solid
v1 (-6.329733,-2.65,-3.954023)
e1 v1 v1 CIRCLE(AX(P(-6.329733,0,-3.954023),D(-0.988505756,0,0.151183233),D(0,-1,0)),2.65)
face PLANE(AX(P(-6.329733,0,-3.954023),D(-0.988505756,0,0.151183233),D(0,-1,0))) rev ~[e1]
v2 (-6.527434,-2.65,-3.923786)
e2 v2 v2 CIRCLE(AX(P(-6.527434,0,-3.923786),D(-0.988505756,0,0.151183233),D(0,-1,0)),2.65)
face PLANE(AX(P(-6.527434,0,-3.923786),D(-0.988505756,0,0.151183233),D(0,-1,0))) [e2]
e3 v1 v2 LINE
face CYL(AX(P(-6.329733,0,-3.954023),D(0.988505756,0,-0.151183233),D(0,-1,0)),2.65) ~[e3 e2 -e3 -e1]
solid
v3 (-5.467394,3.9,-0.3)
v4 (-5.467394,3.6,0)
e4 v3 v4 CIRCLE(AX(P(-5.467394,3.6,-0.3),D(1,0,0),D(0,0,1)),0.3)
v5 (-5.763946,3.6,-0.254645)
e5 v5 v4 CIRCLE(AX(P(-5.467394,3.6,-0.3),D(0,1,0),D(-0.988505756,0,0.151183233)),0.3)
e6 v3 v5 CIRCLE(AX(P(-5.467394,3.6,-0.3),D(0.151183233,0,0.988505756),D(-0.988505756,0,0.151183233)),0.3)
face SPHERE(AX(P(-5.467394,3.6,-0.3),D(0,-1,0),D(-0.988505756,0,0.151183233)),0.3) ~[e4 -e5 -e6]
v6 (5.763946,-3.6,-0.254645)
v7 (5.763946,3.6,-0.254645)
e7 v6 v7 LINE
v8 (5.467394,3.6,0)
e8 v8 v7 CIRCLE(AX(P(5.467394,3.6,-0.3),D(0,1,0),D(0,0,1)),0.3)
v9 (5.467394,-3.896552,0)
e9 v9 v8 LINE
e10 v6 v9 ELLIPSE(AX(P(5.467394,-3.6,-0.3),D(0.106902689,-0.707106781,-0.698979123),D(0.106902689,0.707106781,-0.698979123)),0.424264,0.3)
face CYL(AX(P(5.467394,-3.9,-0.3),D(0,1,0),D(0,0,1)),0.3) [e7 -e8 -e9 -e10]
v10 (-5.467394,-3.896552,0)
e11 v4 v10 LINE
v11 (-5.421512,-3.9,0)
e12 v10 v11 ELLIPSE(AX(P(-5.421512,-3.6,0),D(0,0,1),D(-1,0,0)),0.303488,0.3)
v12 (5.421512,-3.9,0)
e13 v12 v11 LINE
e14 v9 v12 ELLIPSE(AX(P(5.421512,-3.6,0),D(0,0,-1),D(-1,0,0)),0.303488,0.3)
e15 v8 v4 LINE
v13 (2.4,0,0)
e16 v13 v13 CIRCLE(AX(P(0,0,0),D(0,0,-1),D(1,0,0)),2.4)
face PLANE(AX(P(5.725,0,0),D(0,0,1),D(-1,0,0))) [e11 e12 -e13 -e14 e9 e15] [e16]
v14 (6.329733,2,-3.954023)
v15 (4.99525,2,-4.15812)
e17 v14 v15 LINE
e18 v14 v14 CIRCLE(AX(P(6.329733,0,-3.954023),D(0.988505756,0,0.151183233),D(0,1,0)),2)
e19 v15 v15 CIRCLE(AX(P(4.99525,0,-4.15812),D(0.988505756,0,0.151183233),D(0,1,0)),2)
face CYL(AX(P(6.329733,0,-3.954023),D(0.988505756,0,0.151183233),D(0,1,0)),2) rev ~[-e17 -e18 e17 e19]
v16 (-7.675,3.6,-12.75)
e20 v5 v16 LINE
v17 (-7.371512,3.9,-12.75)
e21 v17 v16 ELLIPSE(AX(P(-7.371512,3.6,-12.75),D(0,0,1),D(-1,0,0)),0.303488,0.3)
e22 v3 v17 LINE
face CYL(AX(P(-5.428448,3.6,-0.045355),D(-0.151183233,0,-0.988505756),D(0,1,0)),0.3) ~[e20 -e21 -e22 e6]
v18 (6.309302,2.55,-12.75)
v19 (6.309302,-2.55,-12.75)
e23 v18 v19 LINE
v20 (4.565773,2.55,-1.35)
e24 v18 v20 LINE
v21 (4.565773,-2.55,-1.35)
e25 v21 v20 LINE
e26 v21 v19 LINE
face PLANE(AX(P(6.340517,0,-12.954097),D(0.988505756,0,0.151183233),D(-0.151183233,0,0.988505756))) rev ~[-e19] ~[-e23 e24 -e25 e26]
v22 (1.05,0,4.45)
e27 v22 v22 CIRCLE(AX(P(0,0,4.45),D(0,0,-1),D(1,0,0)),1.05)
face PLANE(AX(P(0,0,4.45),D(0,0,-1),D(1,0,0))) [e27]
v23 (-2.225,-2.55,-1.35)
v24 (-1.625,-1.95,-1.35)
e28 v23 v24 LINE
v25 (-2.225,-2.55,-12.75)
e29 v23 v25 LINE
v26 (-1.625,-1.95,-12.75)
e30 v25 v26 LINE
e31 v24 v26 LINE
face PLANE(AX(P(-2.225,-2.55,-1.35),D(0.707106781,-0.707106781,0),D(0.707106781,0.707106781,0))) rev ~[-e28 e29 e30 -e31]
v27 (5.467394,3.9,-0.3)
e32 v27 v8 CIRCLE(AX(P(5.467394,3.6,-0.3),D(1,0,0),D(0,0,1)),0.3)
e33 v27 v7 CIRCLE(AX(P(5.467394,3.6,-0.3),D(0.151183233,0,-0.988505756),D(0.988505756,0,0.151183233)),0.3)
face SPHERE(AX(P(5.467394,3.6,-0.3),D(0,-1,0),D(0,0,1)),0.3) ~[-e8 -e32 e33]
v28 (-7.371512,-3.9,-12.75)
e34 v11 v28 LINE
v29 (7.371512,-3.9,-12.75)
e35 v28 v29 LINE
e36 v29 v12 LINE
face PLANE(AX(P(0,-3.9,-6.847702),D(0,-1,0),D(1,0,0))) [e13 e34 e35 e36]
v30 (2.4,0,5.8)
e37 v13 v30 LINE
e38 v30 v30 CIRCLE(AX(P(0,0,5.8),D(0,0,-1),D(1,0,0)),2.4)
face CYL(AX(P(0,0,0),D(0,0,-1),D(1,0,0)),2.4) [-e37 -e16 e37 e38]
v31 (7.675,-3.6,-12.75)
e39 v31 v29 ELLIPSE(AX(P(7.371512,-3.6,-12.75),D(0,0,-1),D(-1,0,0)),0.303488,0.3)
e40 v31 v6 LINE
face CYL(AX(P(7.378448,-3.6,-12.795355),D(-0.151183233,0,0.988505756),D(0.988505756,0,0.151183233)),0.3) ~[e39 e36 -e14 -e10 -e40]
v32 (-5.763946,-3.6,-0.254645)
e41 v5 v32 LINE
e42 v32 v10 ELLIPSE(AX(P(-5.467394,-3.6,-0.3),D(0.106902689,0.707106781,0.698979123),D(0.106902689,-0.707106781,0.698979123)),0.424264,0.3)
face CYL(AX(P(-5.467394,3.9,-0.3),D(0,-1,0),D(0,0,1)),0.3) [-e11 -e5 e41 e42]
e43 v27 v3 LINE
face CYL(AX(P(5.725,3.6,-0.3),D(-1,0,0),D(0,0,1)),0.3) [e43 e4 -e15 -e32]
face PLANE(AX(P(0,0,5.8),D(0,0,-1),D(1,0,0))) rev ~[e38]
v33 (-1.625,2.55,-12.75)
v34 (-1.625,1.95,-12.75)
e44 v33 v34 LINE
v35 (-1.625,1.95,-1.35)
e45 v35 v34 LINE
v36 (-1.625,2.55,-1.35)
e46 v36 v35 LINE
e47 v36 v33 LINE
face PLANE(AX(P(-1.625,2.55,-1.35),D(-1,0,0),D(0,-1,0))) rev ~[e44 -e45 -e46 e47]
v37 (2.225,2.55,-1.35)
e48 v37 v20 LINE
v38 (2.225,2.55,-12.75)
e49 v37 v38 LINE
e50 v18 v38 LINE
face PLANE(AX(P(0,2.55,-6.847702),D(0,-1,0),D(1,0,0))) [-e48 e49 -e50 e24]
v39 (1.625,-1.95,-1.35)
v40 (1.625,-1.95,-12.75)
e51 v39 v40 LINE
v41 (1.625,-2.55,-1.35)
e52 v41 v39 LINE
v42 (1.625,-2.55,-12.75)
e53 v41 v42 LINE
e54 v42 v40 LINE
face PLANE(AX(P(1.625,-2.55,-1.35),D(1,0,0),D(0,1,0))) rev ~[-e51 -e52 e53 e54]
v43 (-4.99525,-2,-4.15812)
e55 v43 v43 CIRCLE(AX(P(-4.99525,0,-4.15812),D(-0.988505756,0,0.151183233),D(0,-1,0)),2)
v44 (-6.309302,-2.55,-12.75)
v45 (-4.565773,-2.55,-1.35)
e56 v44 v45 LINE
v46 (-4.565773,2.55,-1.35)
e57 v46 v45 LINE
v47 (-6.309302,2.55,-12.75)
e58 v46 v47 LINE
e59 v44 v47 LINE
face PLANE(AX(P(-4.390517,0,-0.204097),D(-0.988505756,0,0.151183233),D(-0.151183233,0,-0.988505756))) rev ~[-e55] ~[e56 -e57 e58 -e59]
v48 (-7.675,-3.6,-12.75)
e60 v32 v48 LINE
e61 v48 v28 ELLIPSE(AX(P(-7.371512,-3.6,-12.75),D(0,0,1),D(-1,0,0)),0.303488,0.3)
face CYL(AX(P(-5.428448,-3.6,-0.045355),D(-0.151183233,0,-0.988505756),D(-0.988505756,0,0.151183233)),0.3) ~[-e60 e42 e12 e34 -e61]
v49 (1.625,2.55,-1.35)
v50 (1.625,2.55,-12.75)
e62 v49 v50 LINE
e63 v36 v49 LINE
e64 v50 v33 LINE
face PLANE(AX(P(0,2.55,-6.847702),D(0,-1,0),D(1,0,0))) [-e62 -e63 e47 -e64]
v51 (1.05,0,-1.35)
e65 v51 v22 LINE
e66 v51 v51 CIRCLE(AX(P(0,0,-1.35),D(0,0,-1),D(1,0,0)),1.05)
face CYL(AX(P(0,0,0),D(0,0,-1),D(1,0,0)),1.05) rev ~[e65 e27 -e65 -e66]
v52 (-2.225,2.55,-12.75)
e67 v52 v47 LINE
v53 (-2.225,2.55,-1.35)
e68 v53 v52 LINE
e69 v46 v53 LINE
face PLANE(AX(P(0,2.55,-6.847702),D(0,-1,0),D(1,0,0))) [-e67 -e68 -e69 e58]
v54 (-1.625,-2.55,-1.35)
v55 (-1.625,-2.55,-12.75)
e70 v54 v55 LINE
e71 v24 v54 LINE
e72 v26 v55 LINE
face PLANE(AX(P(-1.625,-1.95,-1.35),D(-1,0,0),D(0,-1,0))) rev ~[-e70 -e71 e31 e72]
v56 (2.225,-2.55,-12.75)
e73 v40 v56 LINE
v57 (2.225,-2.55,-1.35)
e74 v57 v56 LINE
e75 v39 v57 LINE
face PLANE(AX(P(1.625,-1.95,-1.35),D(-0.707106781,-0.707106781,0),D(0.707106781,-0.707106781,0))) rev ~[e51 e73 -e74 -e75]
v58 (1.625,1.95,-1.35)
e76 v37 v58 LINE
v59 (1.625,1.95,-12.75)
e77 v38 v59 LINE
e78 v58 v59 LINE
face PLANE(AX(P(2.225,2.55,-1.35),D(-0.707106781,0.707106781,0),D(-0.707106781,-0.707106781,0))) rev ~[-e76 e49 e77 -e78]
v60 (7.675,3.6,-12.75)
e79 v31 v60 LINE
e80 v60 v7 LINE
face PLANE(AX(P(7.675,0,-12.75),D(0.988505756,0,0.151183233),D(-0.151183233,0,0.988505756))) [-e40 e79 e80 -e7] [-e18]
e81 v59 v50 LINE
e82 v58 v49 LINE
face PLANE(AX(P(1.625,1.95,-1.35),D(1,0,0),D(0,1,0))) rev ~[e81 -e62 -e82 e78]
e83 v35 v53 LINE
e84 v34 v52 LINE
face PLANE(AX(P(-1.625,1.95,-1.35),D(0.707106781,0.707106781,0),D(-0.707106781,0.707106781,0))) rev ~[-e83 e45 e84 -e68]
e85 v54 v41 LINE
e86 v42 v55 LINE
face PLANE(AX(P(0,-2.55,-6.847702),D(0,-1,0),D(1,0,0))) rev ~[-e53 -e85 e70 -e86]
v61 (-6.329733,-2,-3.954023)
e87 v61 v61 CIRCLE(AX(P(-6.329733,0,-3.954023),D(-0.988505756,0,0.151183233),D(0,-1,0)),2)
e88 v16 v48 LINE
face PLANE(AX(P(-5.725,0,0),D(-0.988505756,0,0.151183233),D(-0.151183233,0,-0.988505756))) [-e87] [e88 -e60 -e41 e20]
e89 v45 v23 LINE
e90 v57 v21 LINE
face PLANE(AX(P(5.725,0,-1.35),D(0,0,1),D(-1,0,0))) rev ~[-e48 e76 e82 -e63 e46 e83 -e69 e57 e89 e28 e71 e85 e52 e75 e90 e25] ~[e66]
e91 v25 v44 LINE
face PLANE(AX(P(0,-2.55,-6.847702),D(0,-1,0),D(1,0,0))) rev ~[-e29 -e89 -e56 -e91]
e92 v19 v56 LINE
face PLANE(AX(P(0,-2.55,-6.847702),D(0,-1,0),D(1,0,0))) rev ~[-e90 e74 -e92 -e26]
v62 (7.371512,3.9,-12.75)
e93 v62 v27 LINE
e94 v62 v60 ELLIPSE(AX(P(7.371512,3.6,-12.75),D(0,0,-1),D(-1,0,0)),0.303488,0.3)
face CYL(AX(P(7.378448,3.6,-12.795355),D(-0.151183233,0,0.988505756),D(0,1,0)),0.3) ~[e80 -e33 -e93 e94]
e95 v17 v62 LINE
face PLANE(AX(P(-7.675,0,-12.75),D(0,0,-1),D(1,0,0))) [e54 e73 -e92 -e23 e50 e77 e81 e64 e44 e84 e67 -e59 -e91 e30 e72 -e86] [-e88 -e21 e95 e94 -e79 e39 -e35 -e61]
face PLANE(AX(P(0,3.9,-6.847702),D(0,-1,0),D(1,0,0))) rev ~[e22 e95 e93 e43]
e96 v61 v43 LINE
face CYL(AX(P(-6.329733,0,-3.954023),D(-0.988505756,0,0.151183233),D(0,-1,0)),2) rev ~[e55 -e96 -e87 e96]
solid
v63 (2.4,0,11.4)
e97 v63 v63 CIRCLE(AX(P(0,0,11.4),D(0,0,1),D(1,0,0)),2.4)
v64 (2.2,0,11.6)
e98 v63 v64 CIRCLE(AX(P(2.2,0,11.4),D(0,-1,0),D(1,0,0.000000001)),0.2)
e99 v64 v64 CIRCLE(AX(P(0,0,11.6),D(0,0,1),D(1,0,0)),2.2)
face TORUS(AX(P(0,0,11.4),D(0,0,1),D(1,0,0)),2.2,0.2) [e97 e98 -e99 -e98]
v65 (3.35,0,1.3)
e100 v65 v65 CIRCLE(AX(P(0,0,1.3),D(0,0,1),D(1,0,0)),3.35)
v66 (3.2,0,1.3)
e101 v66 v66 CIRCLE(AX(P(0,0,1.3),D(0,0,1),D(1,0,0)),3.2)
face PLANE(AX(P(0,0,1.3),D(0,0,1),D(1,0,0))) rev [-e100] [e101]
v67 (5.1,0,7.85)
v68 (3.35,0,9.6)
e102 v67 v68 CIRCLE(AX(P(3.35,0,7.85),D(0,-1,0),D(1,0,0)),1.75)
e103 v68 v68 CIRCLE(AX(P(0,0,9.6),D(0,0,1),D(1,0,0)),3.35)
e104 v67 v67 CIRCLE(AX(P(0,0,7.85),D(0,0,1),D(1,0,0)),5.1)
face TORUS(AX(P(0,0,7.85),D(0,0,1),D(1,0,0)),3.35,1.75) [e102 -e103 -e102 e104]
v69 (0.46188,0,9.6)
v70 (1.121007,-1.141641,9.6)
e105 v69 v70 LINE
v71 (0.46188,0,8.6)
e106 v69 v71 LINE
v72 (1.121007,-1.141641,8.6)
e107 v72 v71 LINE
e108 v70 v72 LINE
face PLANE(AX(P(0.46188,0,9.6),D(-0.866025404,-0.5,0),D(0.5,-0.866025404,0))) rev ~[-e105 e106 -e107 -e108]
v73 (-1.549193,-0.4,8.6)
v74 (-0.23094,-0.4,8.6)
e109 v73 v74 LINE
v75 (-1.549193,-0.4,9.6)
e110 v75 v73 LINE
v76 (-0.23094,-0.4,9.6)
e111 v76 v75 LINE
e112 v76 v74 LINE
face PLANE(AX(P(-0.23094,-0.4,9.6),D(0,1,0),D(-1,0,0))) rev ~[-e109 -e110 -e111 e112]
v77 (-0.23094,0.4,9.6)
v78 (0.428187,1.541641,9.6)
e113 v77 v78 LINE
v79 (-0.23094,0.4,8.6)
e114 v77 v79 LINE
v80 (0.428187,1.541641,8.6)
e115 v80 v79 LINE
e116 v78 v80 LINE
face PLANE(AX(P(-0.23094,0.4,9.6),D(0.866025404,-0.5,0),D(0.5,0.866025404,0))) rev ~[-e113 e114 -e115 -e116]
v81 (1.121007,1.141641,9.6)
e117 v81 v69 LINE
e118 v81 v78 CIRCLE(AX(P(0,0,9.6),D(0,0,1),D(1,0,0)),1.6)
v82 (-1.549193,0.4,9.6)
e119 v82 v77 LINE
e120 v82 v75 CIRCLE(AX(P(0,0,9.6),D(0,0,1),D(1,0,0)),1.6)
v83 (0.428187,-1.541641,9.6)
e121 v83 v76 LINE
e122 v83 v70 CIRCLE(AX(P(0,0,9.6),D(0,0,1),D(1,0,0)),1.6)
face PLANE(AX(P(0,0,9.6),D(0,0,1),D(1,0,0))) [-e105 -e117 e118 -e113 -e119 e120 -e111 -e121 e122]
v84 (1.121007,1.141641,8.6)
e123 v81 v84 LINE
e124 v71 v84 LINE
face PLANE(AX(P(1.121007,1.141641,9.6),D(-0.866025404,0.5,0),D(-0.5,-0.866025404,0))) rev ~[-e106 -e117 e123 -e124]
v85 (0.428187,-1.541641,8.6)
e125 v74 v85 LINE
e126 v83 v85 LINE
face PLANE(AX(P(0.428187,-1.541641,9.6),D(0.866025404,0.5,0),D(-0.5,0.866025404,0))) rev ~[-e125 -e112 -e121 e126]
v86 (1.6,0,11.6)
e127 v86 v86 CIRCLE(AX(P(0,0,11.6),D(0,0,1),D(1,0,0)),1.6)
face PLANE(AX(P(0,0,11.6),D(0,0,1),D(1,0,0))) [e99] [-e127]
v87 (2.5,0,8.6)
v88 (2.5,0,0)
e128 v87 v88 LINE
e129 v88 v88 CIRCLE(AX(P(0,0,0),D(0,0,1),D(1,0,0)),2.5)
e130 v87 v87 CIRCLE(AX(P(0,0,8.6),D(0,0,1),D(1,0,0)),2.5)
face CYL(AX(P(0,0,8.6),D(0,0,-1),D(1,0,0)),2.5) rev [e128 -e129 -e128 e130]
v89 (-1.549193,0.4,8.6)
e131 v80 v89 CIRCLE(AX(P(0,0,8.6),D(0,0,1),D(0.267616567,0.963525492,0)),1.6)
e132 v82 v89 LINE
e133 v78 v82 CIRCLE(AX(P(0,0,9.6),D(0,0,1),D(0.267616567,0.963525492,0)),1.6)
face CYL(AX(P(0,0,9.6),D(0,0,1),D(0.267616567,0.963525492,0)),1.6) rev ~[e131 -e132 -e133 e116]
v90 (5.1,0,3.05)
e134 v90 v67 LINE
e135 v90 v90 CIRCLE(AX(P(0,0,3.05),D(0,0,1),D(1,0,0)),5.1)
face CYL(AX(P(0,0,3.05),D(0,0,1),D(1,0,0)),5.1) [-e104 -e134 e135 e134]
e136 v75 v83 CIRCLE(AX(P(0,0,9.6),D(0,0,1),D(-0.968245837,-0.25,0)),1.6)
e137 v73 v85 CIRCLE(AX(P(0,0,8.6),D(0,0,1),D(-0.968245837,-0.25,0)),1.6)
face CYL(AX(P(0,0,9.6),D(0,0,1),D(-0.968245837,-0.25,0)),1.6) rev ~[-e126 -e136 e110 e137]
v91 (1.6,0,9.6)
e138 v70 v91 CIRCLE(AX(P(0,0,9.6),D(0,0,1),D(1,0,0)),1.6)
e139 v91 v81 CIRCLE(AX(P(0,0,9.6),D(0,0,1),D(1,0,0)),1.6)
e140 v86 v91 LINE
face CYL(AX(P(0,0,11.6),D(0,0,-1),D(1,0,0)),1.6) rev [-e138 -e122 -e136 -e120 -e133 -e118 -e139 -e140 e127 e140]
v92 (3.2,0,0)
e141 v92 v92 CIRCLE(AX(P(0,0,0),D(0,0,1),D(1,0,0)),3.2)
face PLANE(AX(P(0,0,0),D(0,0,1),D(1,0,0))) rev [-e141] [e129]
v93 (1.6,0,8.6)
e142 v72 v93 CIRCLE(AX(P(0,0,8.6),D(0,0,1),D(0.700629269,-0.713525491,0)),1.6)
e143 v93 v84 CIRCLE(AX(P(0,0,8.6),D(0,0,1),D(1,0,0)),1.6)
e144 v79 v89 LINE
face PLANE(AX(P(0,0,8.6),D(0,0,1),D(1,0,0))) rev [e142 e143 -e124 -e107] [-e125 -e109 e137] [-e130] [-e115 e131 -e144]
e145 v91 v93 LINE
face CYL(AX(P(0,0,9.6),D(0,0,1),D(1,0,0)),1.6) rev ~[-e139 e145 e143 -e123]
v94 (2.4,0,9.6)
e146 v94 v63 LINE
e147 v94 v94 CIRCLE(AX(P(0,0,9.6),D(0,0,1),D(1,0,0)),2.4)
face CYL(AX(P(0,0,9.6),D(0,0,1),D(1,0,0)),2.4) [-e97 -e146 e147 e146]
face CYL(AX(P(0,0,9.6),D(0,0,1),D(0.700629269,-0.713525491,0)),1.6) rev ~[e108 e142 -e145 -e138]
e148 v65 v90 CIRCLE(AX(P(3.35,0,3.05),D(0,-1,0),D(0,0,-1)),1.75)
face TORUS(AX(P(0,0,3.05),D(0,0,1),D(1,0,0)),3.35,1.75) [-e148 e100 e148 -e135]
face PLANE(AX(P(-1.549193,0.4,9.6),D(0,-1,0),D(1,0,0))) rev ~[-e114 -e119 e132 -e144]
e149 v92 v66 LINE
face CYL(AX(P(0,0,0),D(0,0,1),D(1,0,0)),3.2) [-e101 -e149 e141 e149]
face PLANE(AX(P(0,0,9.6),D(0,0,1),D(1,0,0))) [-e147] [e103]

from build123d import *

# Parameters (mm, degrees)
F3_DEPTH  = 5
F4_R      = 2.4
F5_DEPTH  = 5.8
F7_DEPTH  = 3.9
F8_T      = -1.35
F11_DEPTH = 11.4
F10_R     = 2
F13_DEPTH = 1.35
F12_R     = 2
F14_DEPTH = 1.35
F15_R     = 0.3
F16_R     = 2.65
F17_DEPTH = 0.2


with BuildPart() as f1:
    # F0 (on Front) → F1 (revolve)
    with BuildSketch(Plane.XZ):
        with BuildLine():
            Line((2.5, 8.6), (2.5, 0))
            Line((2.5, 0), (3.2, 0))
            Line((3.2, 0), (3.2, 1.3))
            Line((3.2, 1.3), (3.35, 1.3))
            ThreePointArc((3.35, 1.3), (4.5874368671, 1.8125631329), (5.1, 3.05))
            Line((5.1, 3.05), (5.1, 7.85))
            ThreePointArc((5.1, 7.85), (4.5874368671, 9.0874368671), (3.35, 9.6))
            Line((3.35, 9.6), (2.4, 9.6))
            Line((2.4, 9.6), (2.4, 11.4))
            ThreePointArc((2.4, 11.4), (2.3414213562, 11.5414213562), (2.2, 11.6))
            Line((2.2, 11.6), (1.6, 11.6))
            Line((1.6, 11.6), (1.6, 9.6))
            Line((1.6, 9.6), (0, 9.6))
            Line((0, 9.6), (0, 8.6))
            Line((0, 8.6), (2.5, 8.6))
        make_face()
    revolve(axis=Axis((0, 0, 5.8), (0, 0, 1)))

    # F2 (on face) → F3 (cut)
    with BuildSketch(Plane.XY.offset(9.6)):
        with BuildLine():
            Line((-1.5491933385, 0.4), (-0.2309401077, 0.4))
            Line((-0.2309401077, 0.4), (0.4281865077, 1.5416407865))
            ThreePointArc((0.4281865077, 1.5416407865), (-0.8, 1.3856406461), (-1.5491933385, 0.4))
        make_face()
        with BuildLine():
            Line((0.4281865077, -1.5416407865), (-0.2309401077, -0.4))
            Line((-0.2309401077, -0.4), (-1.5491933385, -0.4))
            ThreePointArc((-1.5491933385, -0.4), (-0.8, -1.3856406461), (0.4281865077, -1.5416407865))
        make_face()
        with BuildLine():
            Line((1.1210068308, 1.1416407865), (0.4618802154, 0))
            Line((0.4618802154, 0), (1.1210068308, -1.1416407865))
            ThreePointArc((1.1210068308, -1.1416407865), (1.4754001032, -0.6190270878), (1.6, 0))
            ThreePointArc((1.6, 0), (1.4754001032, 0.6190270878), (1.1210068308, 1.1416407865))
        make_face()
    extrude(amount=-F3_DEPTH, mode=Mode.SUBTRACT)


with BuildPart() as f5:
    # F4 (on face) → F5 (new body)
    with BuildSketch(Plane(origin=(0, 0, 0), x_dir=(1, 0, 0), z_dir=(0, 0, -1))):
        Circle(F4_R)
    extrude(amount=-F5_DEPTH)

    # F6 (on Front) → F7 (join, symmetric)
    with BuildSketch(Plane.XZ):
        Polygon((5.725, 0), (-5.725, 0), (-7.675, -12.75), (7.675, -12.75), align=None)
    extrude(amount=F7_DEPTH, both=True)

    # F8
    f8_openings = [f5.faces().sort_by_distance(p)[0] for p in [
        (0, 0, -12.75),
    ]]
    offset(amount=F8_T, openings=f8_openings, kind=Kind.INTERSECTION)

    # F9 (on face) → F11 (join, through all)
    with BuildSketch(Plane(origin=(0, 0, -1.35), x_dir=(1, 0, 0), z_dir=(0, 0, -1))):
        Polygon((-1.625, 1.95), (-1.625, 2.55), (-2.225, 2.55), align=None)
        Polygon((2.225, 2.55), (1.625, 2.55), (1.625, 1.95), align=None)
        Polygon((1.625, -2.55), (2.225, -2.55), (1.625, -1.95), align=None)
        Polygon((-1.625, -1.95), (-2.225, -2.55), (-1.625, -2.55), align=None)
    extrude(amount=F11_DEPTH)

    # F10 (on face) → F13 (cut)
    with BuildSketch(Plane(origin=(5.5941472816, 0, 0.8555754666), x_dir=(0, 1, 0), z_dir=(0.9885057562, 0, 0.1511832333))):
        with Locations((0, -4.8655240106)):
            Circle(F10_R)
    extrude(amount=-F13_DEPTH, mode=Mode.SUBTRACT)

    # F12 (on face) → F14 (cut)
    with BuildSketch(Plane(origin=(-5.5941472816, 0, 0.8555754666), x_dir=(0, -1, 0), z_dir=(-0.9885057562, 0, 0.1511832333))):
        with Locations((0, -4.8655240106)):
            Circle(F12_R)
    extrude(amount=-F14_DEPTH, mode=Mode.SUBTRACT)

    # F15
    f15_edges = [f5.edges().sort_by_distance(p)[0] for p in [
        (-6.7, -3.9, -6.375),
        (-5.725, 0, 0),
        (-6.7, 3.9, -6.375),
        (0, 3.9, 0),
        (6.7, 3.9, -6.375),
        (5.725, 0, 0),
        (6.7, -3.9, -6.375),
    ]]
    fillet(f15_edges, radius=F15_R)


with BuildPart() as f17:
    # F16 (on face) → F17 (new body)
    with BuildSketch(Plane(origin=(-5.5941472816, 0, 0.8555754666), x_dir=(0, -1, 0), z_dir=(-0.9885057562, 0, 0.1511832333))):
        with Locations((0, -4.8655240106)):
            Circle(F16_R)
    extrude(amount=F17_DEPTH)


solid = Compound([f1.part, f5.part, f17.part])
